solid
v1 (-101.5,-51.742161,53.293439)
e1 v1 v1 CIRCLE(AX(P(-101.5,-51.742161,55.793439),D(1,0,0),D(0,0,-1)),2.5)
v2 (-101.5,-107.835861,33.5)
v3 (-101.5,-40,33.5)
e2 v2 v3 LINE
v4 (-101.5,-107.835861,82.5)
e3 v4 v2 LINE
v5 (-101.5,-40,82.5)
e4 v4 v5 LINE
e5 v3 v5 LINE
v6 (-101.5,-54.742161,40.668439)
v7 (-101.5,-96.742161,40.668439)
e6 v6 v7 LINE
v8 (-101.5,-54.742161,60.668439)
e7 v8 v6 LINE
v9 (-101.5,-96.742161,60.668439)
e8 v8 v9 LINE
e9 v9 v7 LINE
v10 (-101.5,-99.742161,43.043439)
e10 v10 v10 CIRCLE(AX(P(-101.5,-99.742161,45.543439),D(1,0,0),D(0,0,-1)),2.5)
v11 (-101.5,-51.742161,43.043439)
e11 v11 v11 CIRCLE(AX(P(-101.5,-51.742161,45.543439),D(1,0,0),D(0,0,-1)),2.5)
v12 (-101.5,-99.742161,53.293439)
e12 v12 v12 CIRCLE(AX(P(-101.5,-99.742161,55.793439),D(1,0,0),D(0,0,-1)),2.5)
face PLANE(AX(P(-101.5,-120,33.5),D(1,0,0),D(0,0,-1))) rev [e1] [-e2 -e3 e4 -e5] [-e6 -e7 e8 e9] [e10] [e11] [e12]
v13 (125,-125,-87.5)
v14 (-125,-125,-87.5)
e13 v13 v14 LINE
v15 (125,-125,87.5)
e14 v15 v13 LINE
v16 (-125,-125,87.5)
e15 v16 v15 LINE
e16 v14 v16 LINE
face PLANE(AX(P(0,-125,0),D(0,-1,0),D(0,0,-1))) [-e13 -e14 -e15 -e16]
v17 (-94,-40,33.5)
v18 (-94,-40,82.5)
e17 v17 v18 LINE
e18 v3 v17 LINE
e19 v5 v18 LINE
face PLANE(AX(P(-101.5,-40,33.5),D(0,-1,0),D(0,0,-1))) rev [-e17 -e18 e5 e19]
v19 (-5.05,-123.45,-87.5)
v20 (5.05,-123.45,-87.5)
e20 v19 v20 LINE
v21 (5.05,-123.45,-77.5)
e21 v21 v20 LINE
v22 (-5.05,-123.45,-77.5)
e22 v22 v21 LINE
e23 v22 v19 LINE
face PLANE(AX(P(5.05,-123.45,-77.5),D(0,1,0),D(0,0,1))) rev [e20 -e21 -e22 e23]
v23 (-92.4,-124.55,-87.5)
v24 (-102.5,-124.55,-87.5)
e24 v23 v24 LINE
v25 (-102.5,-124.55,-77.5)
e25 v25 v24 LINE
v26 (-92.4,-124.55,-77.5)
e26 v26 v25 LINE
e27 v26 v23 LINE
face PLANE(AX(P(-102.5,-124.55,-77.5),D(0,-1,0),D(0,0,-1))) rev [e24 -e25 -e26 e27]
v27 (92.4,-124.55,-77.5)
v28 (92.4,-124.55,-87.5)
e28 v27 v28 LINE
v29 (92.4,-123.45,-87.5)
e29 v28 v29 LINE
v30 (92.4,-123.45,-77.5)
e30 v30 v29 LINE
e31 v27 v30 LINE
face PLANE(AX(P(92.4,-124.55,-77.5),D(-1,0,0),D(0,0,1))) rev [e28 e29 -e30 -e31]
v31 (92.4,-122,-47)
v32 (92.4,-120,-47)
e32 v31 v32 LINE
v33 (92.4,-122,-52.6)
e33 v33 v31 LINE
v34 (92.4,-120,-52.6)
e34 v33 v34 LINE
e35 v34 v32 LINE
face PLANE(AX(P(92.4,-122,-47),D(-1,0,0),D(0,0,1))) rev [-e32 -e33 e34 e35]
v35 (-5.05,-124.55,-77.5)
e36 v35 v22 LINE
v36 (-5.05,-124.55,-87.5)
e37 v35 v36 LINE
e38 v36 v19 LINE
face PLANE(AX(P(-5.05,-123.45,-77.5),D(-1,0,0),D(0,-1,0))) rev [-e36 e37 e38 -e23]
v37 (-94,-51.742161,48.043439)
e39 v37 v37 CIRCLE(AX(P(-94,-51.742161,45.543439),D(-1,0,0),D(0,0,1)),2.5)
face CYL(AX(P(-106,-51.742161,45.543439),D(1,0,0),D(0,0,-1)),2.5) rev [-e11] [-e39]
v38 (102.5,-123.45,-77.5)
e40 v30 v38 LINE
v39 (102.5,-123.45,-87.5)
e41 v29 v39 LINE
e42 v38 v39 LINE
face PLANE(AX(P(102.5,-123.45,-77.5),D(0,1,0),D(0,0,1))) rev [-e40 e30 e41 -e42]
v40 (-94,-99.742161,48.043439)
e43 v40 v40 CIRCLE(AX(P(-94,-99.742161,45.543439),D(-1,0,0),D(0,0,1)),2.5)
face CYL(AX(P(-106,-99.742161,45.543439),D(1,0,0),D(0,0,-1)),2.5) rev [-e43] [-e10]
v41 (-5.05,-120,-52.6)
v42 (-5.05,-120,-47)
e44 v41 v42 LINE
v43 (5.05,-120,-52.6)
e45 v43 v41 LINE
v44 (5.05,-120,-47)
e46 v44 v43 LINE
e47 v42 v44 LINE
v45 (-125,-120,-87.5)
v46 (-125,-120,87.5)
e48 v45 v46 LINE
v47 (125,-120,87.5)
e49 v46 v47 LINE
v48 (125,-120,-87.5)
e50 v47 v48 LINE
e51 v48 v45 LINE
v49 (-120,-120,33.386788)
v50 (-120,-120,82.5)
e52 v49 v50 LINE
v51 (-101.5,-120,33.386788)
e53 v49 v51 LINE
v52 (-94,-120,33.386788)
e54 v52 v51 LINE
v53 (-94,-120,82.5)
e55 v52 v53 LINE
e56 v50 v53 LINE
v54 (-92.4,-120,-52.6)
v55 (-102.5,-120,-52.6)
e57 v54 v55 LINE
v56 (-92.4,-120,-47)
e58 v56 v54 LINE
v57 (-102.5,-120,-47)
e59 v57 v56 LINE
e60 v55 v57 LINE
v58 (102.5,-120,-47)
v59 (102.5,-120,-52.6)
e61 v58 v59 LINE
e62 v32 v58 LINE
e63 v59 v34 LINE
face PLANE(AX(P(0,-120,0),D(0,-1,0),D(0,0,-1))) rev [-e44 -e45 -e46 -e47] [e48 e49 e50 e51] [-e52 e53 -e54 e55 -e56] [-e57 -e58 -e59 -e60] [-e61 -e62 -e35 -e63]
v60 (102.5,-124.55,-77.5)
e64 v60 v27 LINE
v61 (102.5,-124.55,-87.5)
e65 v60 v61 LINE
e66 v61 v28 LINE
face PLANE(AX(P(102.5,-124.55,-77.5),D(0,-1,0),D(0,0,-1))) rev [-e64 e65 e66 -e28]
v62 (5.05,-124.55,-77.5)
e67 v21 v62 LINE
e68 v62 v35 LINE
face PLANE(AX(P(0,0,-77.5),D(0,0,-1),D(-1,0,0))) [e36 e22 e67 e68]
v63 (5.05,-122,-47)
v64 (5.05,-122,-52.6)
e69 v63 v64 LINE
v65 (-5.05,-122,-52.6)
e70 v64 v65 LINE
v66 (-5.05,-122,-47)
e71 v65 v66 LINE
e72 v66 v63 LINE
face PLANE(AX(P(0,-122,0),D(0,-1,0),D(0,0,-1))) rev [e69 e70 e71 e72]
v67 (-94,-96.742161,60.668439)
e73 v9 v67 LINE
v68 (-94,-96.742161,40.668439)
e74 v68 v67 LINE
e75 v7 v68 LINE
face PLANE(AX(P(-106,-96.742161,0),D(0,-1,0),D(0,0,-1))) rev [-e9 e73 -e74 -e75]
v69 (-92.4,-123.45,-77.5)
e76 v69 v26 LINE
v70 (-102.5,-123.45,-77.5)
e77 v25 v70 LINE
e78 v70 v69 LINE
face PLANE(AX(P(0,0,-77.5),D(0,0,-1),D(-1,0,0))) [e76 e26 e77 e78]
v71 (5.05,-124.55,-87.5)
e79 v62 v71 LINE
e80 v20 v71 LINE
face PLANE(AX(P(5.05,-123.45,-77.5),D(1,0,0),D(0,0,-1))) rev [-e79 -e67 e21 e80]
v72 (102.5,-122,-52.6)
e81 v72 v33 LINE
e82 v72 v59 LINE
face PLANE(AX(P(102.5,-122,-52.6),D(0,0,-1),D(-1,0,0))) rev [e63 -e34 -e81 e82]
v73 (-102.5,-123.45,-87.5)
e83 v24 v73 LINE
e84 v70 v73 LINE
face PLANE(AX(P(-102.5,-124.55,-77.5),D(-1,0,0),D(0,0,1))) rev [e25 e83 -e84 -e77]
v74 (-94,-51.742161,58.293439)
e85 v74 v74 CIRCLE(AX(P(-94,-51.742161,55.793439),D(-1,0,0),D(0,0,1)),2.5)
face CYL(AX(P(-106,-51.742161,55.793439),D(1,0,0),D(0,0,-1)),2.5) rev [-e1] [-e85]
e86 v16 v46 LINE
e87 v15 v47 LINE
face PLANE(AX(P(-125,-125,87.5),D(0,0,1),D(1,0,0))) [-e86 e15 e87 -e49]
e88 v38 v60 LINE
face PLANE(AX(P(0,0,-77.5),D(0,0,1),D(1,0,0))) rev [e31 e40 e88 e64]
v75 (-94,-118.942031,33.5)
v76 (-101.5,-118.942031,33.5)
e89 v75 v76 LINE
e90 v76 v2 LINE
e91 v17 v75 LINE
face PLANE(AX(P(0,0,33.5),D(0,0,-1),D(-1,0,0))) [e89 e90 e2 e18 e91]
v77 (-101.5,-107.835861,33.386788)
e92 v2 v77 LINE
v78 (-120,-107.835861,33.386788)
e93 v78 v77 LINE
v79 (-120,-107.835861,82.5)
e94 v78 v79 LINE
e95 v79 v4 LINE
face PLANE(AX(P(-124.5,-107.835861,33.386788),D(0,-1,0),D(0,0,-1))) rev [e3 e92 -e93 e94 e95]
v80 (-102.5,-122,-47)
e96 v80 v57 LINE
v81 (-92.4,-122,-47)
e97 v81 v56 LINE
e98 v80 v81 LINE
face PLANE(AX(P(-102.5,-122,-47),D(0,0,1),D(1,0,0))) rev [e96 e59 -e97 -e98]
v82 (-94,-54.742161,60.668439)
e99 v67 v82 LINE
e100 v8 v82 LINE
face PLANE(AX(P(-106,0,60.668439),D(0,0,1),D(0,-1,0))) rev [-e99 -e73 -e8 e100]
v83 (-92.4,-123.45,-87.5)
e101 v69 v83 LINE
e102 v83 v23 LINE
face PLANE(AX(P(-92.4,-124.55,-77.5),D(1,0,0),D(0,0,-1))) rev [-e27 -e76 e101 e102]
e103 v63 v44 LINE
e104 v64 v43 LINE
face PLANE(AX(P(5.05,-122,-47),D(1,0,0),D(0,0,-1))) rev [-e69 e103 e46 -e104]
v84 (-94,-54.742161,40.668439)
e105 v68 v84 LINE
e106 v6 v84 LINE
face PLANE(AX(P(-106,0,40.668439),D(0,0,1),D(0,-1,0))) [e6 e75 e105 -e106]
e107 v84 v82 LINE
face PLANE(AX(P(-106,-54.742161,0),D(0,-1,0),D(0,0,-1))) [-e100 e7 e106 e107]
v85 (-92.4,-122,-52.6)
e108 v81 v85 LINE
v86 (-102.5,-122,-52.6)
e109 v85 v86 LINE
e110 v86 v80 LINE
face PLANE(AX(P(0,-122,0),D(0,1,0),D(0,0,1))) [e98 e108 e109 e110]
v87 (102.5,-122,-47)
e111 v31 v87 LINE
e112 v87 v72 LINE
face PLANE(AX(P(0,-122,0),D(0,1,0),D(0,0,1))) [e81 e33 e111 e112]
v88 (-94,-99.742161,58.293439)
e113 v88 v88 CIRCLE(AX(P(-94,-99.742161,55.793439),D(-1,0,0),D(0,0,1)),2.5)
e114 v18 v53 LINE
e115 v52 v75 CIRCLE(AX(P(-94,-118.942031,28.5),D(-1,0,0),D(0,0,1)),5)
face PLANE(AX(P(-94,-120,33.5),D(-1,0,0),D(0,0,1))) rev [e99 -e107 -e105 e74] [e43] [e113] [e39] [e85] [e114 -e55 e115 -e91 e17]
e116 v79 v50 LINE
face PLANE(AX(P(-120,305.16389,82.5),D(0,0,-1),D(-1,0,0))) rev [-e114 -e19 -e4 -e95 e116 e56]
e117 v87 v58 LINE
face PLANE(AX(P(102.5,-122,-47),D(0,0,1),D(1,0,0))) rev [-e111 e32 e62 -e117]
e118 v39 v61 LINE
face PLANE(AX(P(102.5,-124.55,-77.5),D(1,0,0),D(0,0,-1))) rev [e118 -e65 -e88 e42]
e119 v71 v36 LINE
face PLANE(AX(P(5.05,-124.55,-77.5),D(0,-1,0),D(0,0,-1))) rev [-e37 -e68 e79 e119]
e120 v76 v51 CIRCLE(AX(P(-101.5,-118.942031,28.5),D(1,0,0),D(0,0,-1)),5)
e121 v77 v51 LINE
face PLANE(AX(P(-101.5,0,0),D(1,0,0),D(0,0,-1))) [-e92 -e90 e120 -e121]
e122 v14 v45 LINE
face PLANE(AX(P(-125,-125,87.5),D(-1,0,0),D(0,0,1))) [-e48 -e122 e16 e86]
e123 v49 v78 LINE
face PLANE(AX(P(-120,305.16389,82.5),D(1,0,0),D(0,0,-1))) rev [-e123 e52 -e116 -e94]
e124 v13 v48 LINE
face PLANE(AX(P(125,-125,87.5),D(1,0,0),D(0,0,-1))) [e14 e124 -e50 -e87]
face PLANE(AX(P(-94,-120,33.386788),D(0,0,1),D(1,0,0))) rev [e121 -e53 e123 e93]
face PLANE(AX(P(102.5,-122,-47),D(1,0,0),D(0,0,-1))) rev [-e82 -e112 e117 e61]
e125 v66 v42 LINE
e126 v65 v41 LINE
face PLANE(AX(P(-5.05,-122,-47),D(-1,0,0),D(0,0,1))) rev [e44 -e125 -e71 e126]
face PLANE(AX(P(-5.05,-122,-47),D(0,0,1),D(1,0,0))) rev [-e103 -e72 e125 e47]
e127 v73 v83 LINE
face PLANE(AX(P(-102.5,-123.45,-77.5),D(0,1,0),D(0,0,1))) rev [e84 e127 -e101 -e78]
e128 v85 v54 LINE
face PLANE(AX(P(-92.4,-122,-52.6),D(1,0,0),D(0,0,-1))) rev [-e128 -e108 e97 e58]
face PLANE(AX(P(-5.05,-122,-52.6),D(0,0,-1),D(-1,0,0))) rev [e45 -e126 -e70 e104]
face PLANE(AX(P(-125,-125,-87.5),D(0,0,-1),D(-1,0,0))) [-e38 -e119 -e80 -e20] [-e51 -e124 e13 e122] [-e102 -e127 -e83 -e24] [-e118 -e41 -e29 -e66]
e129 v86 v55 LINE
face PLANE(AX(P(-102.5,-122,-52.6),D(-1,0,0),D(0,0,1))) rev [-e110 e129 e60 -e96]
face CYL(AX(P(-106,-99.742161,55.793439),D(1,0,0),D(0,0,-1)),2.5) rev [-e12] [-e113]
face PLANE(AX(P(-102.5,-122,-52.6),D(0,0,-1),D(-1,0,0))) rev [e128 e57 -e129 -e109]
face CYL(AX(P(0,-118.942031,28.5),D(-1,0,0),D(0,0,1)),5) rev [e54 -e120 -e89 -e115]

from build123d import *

# Parameters (mm, degrees)
SKETCH1_W               = 250
SKETCH1_H               = 175
BOSS_EXTRUDE1_DEPTH     = 125
SKETCH2_W               = 240
SKETCH2_H               = 165
CUT_EXTRUDE1_DEPTH      = 120
SKETCH3_W               = 40.1
SKETCH3_H               = 165
CUT_EXTRUDE2_DEPTH      = 198.246672976
SKETCH6_W               = 250
SKETCH6_H               = 175
BOSS_EXTRUDE2_DEPTH     = 5
SKETCH7_W               = 205
SKETCH7_H               = 30
PIANO_PLUG_DEPTH        = 5
ARM_HOLE_REACH          = 199.247
SKETCH8_W               = 50
SKETCH8_H               = 180
BOSS_EXTRUDE8_REACH     = 216.001
SKETCH4_R               = 6
MAIN_SHAFT_HOLE_DEPTH   = 293.884362846
CUT_EXTRUDE8_DEPTH      = 16
CUT_EXTRUDE8_DEPTH_BACK = 33
SKETCH10_R              = 20
BOTTOM_OPEN_DEPTH       = 28
BOTTOM_OPEN_DEPTH_BACK  = 21
SKETCH11_W              = 230
SKETCH11_H              = 155
SKETCH12_W              = 41.033462292
SKETCH12_H              = 5
BOSS_EXTRUDE4_DEPTH     = 233
SKETCH13_W              = 7.5
SKETCH13_H              = 80
BOSS_EXTRUDE5_DEPTH     = 49
SKETCH14_W              = 44.113211518
SKETCH14_H              = 5
BOSS_EXTRUDE6_DEPTH     = 21
FILLET2_R               = 5
SKETCH16_R              = 2.5
SKETCH16_W              = 20
SKETCH16_H              = 42
SERVO_PLUG_HOLE_DEPTH   = 106
SKETCH17_W              = 49.113211518
SKETCH17_H              = 12.164138601
BOSS_EXTRUDE7_DEPTH     = 23
SKETCH19_W              = 10.1
SKETCH19_H              = 5.6
CUT_EXTRUDE9_DEPTH      = 2
SKETCH21_W              = 10.1
SKETCH21_H              = 1.1
CUT_EXTRUDE10_DEPTH     = 10
SKETCH23_W              = 230
SKETCH23_H              = 113.966537708
MAKE_IT_PANEL1_DEPTH    = 5
SKETCH22_W              = 250
SKETCH22_H              = 175
SKETCH22_W_2            = 240
SKETCH22_H_2            = 165
MAKE_IT_PANEL3_DEPTH    = 120
SKETCH24_W              = 240
SKETCH24_H              = 165
CUT_EXTRUDE11_DEPTH     = 5


with BuildPart() as part:
    # Sketch1 → Boss-Extrude1 (new body)
    with BuildSketch(Plane(origin=(0, 0, 0), x_dir=(1, 0, 0), z_dir=(0, 1, 0))):
        Rectangle(SKETCH1_W, SKETCH1_H)
    extrude(amount=-BOSS_EXTRUDE1_DEPTH)

    # Sketch2 → Cut-Extrude1 (cut)
    with BuildSketch(Plane.XZ.offset(125)):
        Rectangle(SKETCH2_W, SKETCH2_H)
    extrude(amount=-CUT_EXTRUDE1_DEPTH, mode=Mode.SUBTRACT)

    # Sketch3 → Cut-Extrude2 (cut, through all)
    with BuildSketch(Plane(origin=(0, 0, 0), x_dir=(1, 0, 0), z_dir=(0, 1, 0))):
        Rectangle(SKETCH3_W, SKETCH3_H)
    extrude(amount=-CUT_EXTRUDE2_DEPTH, mode=Mode.SUBTRACT)

    # Sketch6 → Boss-Extrude2 (add)
    with BuildSketch(Plane.XZ.offset(125)):
        Rectangle(SKETCH6_W, SKETCH6_H)
    extrude(amount=-BOSS_EXTRUDE2_DEPTH)

    # Sketch7 → Piano Plug (cut)
    with BuildSketch(Plane(origin=(0, 0, -87.5), x_dir=(-1, 0, 0), z_dir=(0, 0, -1))):
        with Locations((0, -105)):
            Rectangle(SKETCH7_W, SKETCH7_H)
    extrude(amount=-PIANO_PLUG_DEPTH, mode=Mode.SUBTRACT)

    # Arm Hole: up to this face of the body (flat: up to its plane)
    arm_hole_end = Plane(part.part.faces().sort_by_distance((0, -120, -2.144615385))[0])
    # Sketch8 → Arm Hole (cut, up to the picked face)
    with BuildSketch(Plane(origin=(0, 0, 0), x_dir=(1, 0, 0), z_dir=(0, 1, 0)), mode=Mode.PRIVATE) as arm_hole_sk1:
        with Locations((-0.05, -2.5)):
            Rectangle(SKETCH8_W, SKETCH8_H)
    arm_hole_tool1 = split(extrude(arm_hole_sk1.sketch, amount=-ARM_HOLE_REACH, mode=Mode.PRIVATE), bisect_by=arm_hole_end, keep=Keep.BOTH, mode=Mode.PRIVATE)
    add(arm_hole_tool1.solids().sort_by(Axis((-0.05, 0, 2.5), (0, -1, 0)))[0], mode=Mode.SUBTRACT)

    # Sketch9 → Boss-Extrude8 (add, up to next)
    with BuildSketch(Plane(origin=(-25.05, 0, 0), x_dir=(0, 0, -1), z_dir=(1, 0, 0)), mode=Mode.PRIVATE) as boss_extrude8_sk1:
        Polygon((87.5, 0), (87.5, -90), (82.5, -90), (82.5, -5), (0, -5), (0, 0), align=None)
    boss_extrude8_tool1 = extrude(boss_extrude8_sk1.sketch, amount=BOSS_EXTRUDE8_REACH, mode=Mode.PRIVATE) - part.part
    add(boss_extrude8_tool1.solids().sort_by_distance((-25.05, -45, -86.244761))[0])

    # Sketch4 → Main Shaft Hole (cut, through all)
    with BuildSketch(Plane.ZY.offset(125)):
        with Locations((0, -62.5)):
            Circle(SKETCH4_R)
    extrude(amount=-MAIN_SHAFT_HOLE_DEPTH, mode=Mode.SUBTRACT)

    # Sketch10 → Cut-Extrude8 (cut, two sides: drawn at the far end of the back side and taken through both)
    with BuildSketch(Plane.ZY.offset(125).offset(-CUT_EXTRUDE8_DEPTH_BACK)):
        with Locations((50.8, -62.5)):
            Circle(SKETCH10_R)
    extrude(amount=CUT_EXTRUDE8_DEPTH + CUT_EXTRUDE8_DEPTH_BACK, mode=Mode.SUBTRACT)

    # Sketch11 → Bottom Open (cut, two sides: drawn at the far end of the back side and taken through both)
    with BuildSketch(Plane(origin=(0, -125, 0), x_dir=(-1, 0, 0), z_dir=(0, -1, 0)).offset(-BOTTOM_OPEN_DEPTH_BACK)):
        Rectangle(SKETCH11_W, SKETCH11_H)
    extrude(amount=BOTTOM_OPEN_DEPTH + BOTTOM_OPEN_DEPTH_BACK, mode=Mode.SUBTRACT)

    # Sketch12 → Boss-Extrude4 (add)
    with BuildSketch(Plane(origin=(-115, 0, 0), x_dir=(0, 0, -1), z_dir=(1, 0, 0))):
        with Locations((56.983268854, -122.5)):
            Rectangle(SKETCH12_W, SKETCH12_H)
    extrude(amount=BOSS_EXTRUDE4_DEPTH)

    # Sketch13 → Boss-Extrude5 (add)
    with BuildSketch(Plane(origin=(0, 0, 82.5), x_dir=(-1, 0, 0), z_dir=(0, 0, -1))):
        with Locations((97.75, -80)):
            Rectangle(SKETCH13_W, SKETCH13_H)
    extrude(amount=BOSS_EXTRUDE5_DEPTH)

    # Sketch14 → Boss-Extrude6 (add)
    with BuildSketch(Plane(origin=(-115, 0, 0), x_dir=(0, 0, -1), z_dir=(1, 0, 0))):
        with Locations((-55.443394241, -122.5)):
            Rectangle(SKETCH14_W, SKETCH14_H)
    extrude(amount=BOSS_EXTRUDE6_DEPTH)

    # Fillet2
    # the kernel refuses this fillet: 5 mm, written as the material it adds along each edge
    with BuildSketch(Plane(origin=(-101.5, -120, 33.5), x_dir=(0, 1, 0), z_dir=(1, 0, 0))) as fillet2_piece_1:
        with BuildLine():
            CenterArc((1.057968965, -5), FILLET2_R, 90, 12.215768954)
            Line((0, -0.113211518), (-0.021159379, -0.015475748))
            ThreePointArc((-0.021159379, -0.015475748), (-0.1, -0.056605759), (-0.1, 0))
            Line((-0.1, 0), (0, 0.1))
            Line((0, 0.1), (1.057968965, 0.1))
            Line((1.057968965, 0.1), (1.057968965, 0))
        make_face()
    extrude(amount=7.5)

    # Sketch16 → Servo Plug Hole (cut)
    with BuildSketch(Plane(origin=(0, 0, 0), x_dir=(0, 0, -1), z_dir=(1, 0, 0))):
        with Locations((-45.543439041, -51.74216133)):
            Circle(SKETCH16_R)
        with Locations((-55.793439041, -51.74216133)):
            Circle(SKETCH16_R)
        with Locations((-50.668439041, -75.74216133)):
            Rectangle(SKETCH16_W, SKETCH16_H)
        with Locations((-45.543439041, -99.74216133)):
            Circle(SKETCH16_R)
        with Locations((-55.793439041, -99.74216133)):
            Circle(SKETCH16_R)
    extrude(amount=-SERVO_PLUG_HOLE_DEPTH, mode=Mode.SUBTRACT)

    # Sketch17 → Boss-Extrude7 (add)
    with BuildSketch(Plane.ZY.offset(101.5)):
        with Locations((57.943394241, -113.9179307)):
            Rectangle(SKETCH17_W, SKETCH17_H)
    extrude(amount=BOSS_EXTRUDE7_DEPTH)

    # Sketch19 → Cut-Extrude9 (cut)
    with BuildSketch(Plane(origin=(0, -120, 0), x_dir=(1, 0, 0), z_dir=(0, 1, 0))):
        with Locations((97.45, 49.8)):
            Rectangle(SKETCH19_W, SKETCH19_H)
        with Locations((-97.45, 49.8)):
            Rectangle(SKETCH19_W, SKETCH19_H)
        with Locations((0, 49.8)):
            Rectangle(SKETCH19_W, SKETCH19_H)
    extrude(amount=-CUT_EXTRUDE9_DEPTH, mode=Mode.SUBTRACT)

    # Sketch21 → Cut-Extrude10 (cut)
    with BuildSketch(Plane(origin=(0, 0, -87.5), x_dir=(-1, 0, 0), z_dir=(0, 0, -1))):
        with Locations((-97.45, -124)):
            Rectangle(SKETCH21_W, SKETCH21_H)
        with Locations((97.45, -124)):
            Rectangle(SKETCH21_W, SKETCH21_H)
        with Locations((0, -124)):
            Rectangle(SKETCH21_W, SKETCH21_H)
    extrude(amount=-CUT_EXTRUDE10_DEPTH, mode=Mode.SUBTRACT)

    # Sketch23 → Make it Panel1 (add)
    with BuildSketch(Plane(origin=(0, -120, 0), x_dir=(1, 0, 0), z_dir=(0, 1, 0))):
        with Locations((0, -20.516731146)):
            Rectangle(SKETCH23_W, SKETCH23_H)
    extrude(amount=-MAKE_IT_PANEL1_DEPTH)

    # Sketch22 → Make it Panel3 (cut)
    with BuildSketch(Plane(origin=(0, -120, 0), x_dir=(1, 0, 0), z_dir=(0, 1, 0))):
        Rectangle(SKETCH22_W, SKETCH22_H)
        Rectangle(SKETCH22_W_2, SKETCH22_H_2, mode=Mode.SUBTRACT)
    extrude(amount=MAKE_IT_PANEL3_DEPTH, mode=Mode.SUBTRACT)


with BuildPart() as make_it_panel3_piece_1:
    # of the separate pieces the step leaves, piece 1, a body of its own (make_it_panel3_pieces)
    add(part.part.solids().sort_by_distance((-101.5, -118.942031035, 33.5))[0])


with BuildPart() as make_it_panel3_piece_2:
    # of the separate pieces the step leaves, piece 2, a body of its own (make_it_panel3_pieces)
    add(part.part.solids().sort_by_distance((-25.05, -5, 82.5))[0])

    # Sketch24 → Cut-Extrude11 (cut)
    with BuildSketch(Plane(origin=(0, 0, 0), x_dir=(1, 0, 0), z_dir=(0, 1, 0))):
        Rectangle(SKETCH24_W, SKETCH24_H)
    extrude(amount=-CUT_EXTRUDE11_DEPTH, mode=Mode.SUBTRACT)


solid = make_it_panel3_piece_1.part
